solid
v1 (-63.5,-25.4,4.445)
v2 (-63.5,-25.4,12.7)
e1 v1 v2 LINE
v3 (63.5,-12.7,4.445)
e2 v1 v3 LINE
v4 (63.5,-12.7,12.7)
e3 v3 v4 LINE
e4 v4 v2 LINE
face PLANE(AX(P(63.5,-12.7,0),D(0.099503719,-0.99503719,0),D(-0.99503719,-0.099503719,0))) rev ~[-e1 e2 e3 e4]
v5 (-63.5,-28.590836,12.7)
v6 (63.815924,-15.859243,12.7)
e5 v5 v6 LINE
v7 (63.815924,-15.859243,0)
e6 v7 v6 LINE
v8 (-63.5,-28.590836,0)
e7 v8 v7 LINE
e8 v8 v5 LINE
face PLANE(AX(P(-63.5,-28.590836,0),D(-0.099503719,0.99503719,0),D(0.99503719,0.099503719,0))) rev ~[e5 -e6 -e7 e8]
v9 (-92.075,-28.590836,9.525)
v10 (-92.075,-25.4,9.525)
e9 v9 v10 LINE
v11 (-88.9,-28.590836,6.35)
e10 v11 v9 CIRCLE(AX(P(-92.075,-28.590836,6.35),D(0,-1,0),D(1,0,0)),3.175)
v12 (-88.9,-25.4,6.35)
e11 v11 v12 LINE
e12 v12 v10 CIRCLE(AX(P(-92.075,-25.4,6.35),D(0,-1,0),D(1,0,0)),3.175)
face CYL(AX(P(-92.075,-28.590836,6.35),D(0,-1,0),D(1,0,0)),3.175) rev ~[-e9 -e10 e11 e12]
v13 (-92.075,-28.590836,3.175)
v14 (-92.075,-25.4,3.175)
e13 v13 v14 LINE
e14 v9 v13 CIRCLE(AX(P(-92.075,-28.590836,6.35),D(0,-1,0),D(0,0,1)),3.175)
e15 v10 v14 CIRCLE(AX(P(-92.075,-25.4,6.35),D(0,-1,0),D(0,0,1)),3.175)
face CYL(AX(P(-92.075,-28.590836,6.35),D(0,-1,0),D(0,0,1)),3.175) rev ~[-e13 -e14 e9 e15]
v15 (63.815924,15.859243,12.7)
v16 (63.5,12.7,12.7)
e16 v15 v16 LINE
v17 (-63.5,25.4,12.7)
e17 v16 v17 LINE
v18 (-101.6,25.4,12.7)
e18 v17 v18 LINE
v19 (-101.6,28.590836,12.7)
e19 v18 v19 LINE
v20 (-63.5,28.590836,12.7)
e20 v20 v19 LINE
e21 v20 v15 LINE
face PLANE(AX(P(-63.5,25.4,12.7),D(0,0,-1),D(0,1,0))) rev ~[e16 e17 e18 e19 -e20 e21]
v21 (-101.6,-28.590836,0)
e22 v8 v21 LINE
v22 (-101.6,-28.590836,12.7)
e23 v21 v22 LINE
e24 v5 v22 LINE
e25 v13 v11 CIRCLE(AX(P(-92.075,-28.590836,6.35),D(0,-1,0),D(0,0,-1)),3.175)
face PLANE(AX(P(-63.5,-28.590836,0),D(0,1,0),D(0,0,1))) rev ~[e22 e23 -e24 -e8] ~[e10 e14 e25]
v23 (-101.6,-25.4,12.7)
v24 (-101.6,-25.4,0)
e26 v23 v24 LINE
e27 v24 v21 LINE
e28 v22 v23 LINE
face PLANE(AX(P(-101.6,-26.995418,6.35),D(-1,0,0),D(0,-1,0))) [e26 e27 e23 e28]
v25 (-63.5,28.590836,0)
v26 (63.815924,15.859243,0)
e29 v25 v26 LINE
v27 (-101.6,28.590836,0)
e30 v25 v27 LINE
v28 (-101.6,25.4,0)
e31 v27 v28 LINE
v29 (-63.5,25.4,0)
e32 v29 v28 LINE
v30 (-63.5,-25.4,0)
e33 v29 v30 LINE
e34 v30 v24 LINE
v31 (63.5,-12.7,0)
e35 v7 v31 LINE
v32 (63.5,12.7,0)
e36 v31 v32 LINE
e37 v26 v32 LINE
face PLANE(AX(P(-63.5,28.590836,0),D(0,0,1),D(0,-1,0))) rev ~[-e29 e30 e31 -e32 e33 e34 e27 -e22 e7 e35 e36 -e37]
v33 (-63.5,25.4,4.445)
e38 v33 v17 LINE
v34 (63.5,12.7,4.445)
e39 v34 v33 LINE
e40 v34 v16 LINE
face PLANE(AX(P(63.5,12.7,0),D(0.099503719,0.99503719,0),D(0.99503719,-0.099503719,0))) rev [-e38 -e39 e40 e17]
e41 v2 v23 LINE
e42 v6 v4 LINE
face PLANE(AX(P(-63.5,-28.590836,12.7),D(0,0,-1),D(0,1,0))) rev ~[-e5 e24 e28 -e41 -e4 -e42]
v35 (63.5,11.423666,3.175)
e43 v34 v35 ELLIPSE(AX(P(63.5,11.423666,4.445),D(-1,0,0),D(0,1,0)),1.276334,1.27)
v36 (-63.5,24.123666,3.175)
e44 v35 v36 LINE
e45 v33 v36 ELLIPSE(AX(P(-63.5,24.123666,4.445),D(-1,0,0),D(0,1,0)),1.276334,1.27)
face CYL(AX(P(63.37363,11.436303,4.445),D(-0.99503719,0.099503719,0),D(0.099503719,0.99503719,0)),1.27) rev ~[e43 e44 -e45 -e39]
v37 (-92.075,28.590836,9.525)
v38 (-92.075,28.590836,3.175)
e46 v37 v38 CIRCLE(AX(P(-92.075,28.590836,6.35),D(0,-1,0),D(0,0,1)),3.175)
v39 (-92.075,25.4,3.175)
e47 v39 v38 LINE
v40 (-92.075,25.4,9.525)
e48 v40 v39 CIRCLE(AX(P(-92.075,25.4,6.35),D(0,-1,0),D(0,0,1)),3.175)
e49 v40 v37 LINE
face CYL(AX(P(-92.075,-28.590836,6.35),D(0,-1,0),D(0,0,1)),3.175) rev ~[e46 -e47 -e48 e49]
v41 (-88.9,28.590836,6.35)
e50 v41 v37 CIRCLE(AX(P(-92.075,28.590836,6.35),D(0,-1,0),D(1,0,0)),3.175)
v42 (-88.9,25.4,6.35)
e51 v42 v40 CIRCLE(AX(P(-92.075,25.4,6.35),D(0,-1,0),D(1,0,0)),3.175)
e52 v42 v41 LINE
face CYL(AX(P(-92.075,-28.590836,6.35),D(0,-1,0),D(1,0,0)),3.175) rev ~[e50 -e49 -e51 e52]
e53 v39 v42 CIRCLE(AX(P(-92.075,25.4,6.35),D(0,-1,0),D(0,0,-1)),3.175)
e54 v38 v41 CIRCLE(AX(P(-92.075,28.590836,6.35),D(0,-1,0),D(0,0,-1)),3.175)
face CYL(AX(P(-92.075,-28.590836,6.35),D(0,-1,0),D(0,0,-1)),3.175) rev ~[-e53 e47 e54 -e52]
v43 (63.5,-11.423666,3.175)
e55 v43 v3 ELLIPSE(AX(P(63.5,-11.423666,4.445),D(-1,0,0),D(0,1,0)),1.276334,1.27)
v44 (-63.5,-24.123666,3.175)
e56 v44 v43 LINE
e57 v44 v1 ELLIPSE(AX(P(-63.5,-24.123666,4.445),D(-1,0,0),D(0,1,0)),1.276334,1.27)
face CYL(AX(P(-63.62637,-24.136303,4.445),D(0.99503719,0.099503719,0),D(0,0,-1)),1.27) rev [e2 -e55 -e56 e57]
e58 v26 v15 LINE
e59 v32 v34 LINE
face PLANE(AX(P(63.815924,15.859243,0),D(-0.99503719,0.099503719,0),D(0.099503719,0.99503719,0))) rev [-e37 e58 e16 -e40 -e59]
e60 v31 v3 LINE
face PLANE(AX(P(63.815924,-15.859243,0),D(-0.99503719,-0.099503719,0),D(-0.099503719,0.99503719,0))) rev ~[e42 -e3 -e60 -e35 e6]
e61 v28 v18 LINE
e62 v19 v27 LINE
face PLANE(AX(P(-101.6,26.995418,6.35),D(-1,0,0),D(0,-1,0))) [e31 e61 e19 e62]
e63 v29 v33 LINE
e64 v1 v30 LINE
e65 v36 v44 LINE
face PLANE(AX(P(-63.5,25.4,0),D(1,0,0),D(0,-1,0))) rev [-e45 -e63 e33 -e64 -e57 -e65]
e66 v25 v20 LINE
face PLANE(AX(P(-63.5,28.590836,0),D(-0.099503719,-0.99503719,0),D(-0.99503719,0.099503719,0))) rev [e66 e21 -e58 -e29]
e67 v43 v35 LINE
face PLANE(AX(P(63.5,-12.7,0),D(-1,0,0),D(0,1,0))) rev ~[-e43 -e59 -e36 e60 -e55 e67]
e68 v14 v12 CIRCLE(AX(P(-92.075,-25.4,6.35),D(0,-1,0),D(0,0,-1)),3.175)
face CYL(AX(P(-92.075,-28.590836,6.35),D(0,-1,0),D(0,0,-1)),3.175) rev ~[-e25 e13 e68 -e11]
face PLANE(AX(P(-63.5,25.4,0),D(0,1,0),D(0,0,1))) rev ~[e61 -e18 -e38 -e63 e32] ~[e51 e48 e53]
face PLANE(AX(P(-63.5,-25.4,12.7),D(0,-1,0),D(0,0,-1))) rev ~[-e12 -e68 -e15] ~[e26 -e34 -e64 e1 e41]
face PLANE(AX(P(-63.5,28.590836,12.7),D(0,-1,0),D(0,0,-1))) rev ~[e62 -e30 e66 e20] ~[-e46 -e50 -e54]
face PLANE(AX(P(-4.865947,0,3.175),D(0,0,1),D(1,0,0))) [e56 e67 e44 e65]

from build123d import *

# Parameters (mm, degrees)
F1_DEPTH = 3.175
F3_DEPTH = 12.7
F5_R     = 1.27
F7_DEPTH = 38.1
F9_DEPTH = 57.1826710194


# Not quite as in the source:
# - a length typed as a fraction of an inch, garbled in the dataset ("3 / 203.2 mm" for 3/8 in), is restored


with BuildPart() as f1:
    # F0 (on Top) → F1 (new body)
    with BuildSketch(Plane.XY):
        Polygon((-63.5, -25.4), (63.5, -12.7), (63.5, 12.7), (-63.5, 25.4), align=None)
    extrude(amount=F1_DEPTH)

    # F2 (on Top) → F3 (join)
    with BuildSketch(Plane.XY):
        Polygon((-63.5, -25.4), (-63.5, -28.5908355097), (63.8159243079, -15.8592430789), (63.5, -12.7), align=None)
    extrude(amount=F3_DEPTH)

    # F4: F1 across plane


with BuildPart() as f1_1:
    add(f1.part)
    add(f1.part.mirror(Plane.XZ))

    # F5
    f5_edges = [f1_1.edges().sort_by_distance(p)[0] for p in [
        (0, -19.05, 3.175),
        (0, 19.05, 3.175),
    ]]
    fillet(f5_edges, radius=F5_R)

    # F6 (on face) → F7 (join)
    with BuildSketch(Plane(origin=(-63.5, 0, 0), x_dir=(0, -1, 0), z_dir=(-1, 0, 0))):
        Polygon((-25.4, 12.7), (-28.5908355097, 12.7), (-28.5908355097, 0), (-25.4, 0), (-25.4, 4.445), align=None)
        Polygon((25.4, 4.445), (25.4, 0), (28.5908355097, 0), (28.5908355097, 12.7), (25.4, 12.7), align=None)
    extrude(amount=F7_DEPTH)

    # F8 (on face) → F9 (cut, through all)
    with BuildSketch(Plane.XZ.offset(28.5908355097)):
        with BuildLine():
            Line((-92.075, 3.175), (-92.075, 9.525))
            ThreePointArc((-92.075, 9.525), (-95.25, 6.35), (-92.075, 3.175))
        make_face()
        with BuildLine():
            ThreePointArc((-88.9, 6.35), (-89.8299359697, 8.5950640303), (-92.075, 9.525))
            Line((-92.075, 9.525), (-92.075, 3.175))
            ThreePointArc((-92.075, 3.175), (-89.8299359697, 4.1049359697), (-88.9, 6.35))
        make_face()
    extrude(amount=-F9_DEPTH, mode=Mode.SUBTRACT)


solid = f1_1.part
